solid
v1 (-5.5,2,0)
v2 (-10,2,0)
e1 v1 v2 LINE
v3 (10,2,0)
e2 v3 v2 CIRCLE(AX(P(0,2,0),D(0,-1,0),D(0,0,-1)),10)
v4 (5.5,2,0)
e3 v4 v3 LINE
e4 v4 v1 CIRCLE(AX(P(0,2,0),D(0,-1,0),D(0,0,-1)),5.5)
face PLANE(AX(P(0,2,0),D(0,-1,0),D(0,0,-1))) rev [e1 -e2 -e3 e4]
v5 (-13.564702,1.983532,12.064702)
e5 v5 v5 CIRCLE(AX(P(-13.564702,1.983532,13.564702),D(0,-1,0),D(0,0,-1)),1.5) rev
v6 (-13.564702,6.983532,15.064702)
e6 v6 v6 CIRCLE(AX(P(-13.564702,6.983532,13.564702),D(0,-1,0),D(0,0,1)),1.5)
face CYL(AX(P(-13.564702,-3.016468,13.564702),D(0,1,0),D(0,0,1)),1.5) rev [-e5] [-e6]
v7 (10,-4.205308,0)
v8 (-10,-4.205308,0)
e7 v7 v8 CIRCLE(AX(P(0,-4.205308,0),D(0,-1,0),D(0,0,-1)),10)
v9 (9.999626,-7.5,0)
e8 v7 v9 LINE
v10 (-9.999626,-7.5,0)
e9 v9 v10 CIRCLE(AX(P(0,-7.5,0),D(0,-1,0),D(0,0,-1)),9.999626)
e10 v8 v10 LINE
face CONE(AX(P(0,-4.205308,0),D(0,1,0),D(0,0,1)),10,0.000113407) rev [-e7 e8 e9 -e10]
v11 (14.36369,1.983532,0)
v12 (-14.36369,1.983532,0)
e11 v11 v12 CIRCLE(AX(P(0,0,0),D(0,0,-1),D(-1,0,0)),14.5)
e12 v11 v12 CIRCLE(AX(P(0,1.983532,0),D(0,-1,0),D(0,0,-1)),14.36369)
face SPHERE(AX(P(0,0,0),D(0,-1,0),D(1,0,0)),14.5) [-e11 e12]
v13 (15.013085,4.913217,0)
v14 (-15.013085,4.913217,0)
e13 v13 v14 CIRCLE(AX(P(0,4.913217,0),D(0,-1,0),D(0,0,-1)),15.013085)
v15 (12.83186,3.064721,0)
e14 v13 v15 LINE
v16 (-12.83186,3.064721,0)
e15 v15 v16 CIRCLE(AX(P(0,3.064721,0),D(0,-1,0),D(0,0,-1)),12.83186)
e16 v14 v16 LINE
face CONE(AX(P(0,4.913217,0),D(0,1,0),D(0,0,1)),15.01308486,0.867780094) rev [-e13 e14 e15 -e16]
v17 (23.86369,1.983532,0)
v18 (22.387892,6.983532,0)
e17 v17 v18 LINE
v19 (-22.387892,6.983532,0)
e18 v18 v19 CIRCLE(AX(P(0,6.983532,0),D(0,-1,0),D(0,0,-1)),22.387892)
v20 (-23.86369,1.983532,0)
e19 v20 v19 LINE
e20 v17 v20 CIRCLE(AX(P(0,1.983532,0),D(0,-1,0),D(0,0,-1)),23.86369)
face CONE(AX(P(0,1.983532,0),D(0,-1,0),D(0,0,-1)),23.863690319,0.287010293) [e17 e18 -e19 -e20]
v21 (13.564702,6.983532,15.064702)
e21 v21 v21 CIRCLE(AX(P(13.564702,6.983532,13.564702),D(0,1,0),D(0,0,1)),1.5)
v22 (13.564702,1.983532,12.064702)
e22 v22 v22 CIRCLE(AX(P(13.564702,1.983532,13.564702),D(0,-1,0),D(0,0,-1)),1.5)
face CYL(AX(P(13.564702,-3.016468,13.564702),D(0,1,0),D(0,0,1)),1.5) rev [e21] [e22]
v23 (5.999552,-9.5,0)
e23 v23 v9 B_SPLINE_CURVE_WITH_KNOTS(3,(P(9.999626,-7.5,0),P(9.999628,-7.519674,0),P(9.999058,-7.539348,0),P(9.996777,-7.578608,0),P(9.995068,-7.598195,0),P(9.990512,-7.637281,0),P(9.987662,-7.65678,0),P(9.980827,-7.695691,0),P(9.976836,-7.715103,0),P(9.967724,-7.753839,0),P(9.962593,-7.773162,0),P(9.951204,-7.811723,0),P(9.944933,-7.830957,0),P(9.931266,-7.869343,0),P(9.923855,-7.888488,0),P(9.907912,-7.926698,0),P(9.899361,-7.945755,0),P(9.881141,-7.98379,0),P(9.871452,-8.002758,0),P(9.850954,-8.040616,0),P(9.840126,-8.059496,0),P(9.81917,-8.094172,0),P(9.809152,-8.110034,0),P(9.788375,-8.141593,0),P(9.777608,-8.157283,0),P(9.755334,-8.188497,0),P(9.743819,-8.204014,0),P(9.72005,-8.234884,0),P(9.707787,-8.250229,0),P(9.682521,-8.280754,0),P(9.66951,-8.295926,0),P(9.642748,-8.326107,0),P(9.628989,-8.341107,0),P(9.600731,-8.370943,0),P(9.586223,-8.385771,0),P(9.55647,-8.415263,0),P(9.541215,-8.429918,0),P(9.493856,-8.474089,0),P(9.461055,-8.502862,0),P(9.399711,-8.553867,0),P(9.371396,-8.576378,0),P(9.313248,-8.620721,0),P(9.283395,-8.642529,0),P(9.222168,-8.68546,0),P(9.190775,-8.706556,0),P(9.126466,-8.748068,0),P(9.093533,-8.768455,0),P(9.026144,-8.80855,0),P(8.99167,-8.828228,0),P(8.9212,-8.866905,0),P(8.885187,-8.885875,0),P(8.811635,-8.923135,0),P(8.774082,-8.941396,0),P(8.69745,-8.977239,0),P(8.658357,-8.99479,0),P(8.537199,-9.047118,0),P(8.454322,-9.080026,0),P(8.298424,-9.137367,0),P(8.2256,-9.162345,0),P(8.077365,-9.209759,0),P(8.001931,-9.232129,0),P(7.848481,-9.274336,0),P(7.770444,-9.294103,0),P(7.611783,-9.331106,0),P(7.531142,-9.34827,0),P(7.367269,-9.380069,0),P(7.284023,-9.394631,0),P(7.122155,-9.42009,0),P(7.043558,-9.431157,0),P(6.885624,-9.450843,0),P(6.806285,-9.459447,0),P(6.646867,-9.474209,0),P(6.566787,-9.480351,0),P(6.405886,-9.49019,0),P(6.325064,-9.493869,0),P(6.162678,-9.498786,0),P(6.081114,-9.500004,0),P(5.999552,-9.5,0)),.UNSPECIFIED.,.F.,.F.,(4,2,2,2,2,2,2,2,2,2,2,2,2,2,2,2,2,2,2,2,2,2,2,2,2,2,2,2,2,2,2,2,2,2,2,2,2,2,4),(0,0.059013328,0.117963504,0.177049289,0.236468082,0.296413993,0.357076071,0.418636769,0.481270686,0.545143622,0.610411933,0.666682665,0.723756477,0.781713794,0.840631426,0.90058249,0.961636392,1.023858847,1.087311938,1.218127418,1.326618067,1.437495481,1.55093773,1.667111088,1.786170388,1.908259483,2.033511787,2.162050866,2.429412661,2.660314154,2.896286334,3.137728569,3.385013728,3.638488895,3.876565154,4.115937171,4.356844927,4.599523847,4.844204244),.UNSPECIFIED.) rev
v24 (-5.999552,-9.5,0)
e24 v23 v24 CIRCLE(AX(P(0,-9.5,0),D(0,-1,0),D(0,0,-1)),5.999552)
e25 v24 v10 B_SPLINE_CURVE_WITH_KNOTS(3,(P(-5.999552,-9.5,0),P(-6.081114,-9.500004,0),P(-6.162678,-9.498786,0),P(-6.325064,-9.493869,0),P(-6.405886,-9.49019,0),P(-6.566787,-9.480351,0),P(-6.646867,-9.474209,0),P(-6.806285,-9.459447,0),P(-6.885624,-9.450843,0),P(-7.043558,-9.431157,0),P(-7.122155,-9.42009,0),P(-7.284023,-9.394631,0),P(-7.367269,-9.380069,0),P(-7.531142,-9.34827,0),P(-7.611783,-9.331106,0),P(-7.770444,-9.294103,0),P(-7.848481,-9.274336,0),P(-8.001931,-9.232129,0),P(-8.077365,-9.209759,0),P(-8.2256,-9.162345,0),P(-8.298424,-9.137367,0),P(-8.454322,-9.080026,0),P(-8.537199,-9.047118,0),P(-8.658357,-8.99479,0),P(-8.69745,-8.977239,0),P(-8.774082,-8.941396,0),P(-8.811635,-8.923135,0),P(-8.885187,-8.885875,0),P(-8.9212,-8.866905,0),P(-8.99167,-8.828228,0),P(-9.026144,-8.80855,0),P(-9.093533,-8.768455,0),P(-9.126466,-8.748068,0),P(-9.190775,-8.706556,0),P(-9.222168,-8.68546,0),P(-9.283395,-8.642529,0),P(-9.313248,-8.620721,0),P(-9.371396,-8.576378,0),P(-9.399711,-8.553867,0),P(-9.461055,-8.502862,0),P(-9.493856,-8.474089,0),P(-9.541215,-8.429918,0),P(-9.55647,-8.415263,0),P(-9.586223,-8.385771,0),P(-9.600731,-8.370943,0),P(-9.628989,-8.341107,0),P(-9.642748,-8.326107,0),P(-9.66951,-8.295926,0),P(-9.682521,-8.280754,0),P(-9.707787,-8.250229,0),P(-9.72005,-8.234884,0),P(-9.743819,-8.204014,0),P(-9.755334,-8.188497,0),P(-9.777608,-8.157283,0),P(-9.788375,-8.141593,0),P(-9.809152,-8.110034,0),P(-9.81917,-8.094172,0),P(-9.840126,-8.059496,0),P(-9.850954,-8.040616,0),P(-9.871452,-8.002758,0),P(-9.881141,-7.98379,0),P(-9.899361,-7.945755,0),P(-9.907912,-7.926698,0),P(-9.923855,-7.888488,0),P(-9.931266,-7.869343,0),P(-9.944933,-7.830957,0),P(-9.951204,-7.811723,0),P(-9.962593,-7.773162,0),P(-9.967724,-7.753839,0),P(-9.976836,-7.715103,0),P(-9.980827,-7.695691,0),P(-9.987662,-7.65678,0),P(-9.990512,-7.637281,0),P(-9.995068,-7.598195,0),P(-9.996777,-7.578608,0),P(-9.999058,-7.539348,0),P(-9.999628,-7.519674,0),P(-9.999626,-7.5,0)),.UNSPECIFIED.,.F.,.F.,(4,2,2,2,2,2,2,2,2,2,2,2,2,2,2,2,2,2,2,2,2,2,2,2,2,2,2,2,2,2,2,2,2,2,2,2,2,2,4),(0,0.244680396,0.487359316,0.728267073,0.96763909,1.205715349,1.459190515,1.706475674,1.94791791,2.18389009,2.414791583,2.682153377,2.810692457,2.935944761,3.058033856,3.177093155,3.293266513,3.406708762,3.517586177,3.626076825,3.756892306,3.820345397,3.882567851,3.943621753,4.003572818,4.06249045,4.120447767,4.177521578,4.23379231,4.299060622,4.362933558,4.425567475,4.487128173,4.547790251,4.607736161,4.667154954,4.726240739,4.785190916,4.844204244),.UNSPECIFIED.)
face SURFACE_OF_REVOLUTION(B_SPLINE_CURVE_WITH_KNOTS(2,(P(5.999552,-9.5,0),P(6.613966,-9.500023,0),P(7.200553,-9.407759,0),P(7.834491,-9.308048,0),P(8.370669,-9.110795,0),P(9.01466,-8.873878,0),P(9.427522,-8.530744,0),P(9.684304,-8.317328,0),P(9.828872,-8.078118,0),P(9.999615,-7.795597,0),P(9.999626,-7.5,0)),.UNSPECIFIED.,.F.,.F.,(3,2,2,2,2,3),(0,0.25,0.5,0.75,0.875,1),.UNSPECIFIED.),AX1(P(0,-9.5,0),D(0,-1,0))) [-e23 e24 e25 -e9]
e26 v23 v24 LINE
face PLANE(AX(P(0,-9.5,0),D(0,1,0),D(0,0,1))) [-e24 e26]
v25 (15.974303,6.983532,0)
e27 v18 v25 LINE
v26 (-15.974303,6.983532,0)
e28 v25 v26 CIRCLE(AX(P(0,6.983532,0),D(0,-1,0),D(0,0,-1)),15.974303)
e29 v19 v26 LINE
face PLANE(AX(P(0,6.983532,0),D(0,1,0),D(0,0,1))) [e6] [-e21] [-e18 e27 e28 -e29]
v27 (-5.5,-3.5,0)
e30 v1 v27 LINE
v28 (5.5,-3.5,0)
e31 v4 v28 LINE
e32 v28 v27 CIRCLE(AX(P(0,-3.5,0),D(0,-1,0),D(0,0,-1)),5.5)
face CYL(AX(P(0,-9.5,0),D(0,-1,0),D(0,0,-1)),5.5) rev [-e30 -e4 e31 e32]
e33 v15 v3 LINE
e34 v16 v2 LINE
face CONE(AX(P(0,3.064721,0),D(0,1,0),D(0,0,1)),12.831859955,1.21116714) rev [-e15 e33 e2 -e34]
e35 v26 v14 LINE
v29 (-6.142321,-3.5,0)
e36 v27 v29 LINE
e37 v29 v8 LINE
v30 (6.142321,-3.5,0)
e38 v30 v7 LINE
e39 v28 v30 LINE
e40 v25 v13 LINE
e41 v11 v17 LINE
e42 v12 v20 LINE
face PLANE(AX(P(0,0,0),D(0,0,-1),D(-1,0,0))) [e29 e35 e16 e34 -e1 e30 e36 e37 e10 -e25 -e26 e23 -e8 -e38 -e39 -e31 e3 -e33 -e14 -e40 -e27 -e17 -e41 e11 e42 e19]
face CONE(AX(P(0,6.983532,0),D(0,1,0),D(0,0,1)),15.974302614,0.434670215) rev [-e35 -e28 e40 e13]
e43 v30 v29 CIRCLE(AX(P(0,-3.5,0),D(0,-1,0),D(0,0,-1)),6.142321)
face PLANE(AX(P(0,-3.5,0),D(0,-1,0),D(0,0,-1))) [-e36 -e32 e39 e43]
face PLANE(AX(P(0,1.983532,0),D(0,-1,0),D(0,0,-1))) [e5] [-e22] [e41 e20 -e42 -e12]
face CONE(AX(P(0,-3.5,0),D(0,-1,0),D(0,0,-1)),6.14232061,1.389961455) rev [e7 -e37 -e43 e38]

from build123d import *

# Parameters (mm, degrees)
REVOLVE1_ANGLE     = 180
FILLET1_SIZE       = 4
FILLET1_SIZE_2     = 2
CHAMFER1_SIZE      = 4
CHAMFER1_SIZE2     = 0.705307923
REVOLVE2_ANGLE     = 180
SKETCH3_R          = 1.5
CUT_EXTRUDE1_DEPTH = 10


with BuildPart() as part:
    # Sketch1 → Revolve1 (revolve)
    with BuildSketch(Plane.XY):
        Polygon((0, -9.5), (0, 2), (-5.5, 2), (-5.5, -3.5), (-10, -3.5), (-10, -9.5), align=None)
    revolve(axis=Axis((0, -14.5, 0), (0, 1, 0)), revolution_arc=REVOLVE1_ANGLE)

    # Fillet1
    # an asymmetric fillet: 4, 2 mm, written as the material it takes off along each edge
    with BuildSketch(Plane(origin=(0, -9.5, 0), x_dir=(-0.5389483633149525, 0, -0.8423388045674578), z_dir=(0.8423388045674578, 0, -0.5389483633149525))) as fillet1_piece_1:
        with BuildLine():
            Bezier((10 - FILLET1_SIZE, 0), (10, 0), (10, FILLET1_SIZE_2), weights=[1, 0.707106781, 1])
            Line((10, FILLET1_SIZE_2), (10, 0))
            Line((10, 0), (10 - FILLET1_SIZE, 0))
        make_face()
    revolve(axis=Axis((0, -9.5, 0), (0, 1, 0)), revolution_arc=294.775843921, mode=Mode.SUBTRACT)

    # Chamfer1
    chamfer1_edges = [part.edges().sort_by_distance(p)[0] for p in [
        (0, -3.5, 10),
    ]]
    chamfer1_side = [part.faces().sort_by_distance(p)[0] for p in [
        (0, -3.5, 5.723606798),
    ]]
    chamfer(chamfer1_edges, length=CHAMFER1_SIZE, length2=CHAMFER1_SIZE2, reference=chamfer1_side[0])


with BuildPart() as body_2:
    # Sketch2 → Revolve2 (revolve)
    with BuildSketch(Plane.XY):
        with BuildLine():
            Line((-5.5, 2), (-10, 2))
            Line((-10, 2), (-12.831859955, 3.064721462))
            Line((-12.831859955, 3.064721462), (-15.01308486, 4.913217144))
            Line((-15.01308486, 4.913217144), (-15.974302614, 6.983532307))
            Line((-15.974302614, 6.983532307), (-19.387891627, 6.983532307))
            Line((-19.387891627, 6.983532307), (-22.387891627, 6.983532307))
            Line((-22.387891627, 6.983532307), (-23.863690319, 1.983532307))
            Line((-23.863690319, 1.983532307), (-14.363690319, 1.983532307))
            ThreePointArc((-14.363690319, 1.983532307), (-10.931862112, -9.525985029), (0, -14.5))
            Line((0, -14.5), (0, -9.5))
            Line((0, -9.5), (-5.99955163, -9.5))
            add(Edge.make_bspline(
                [(-5.99955163, -9.5), (-6.613966051, -9.500022958), (-7.200553434, -9.407759327), (-7.834490948, -9.308048049), (-8.370669156, -9.110794638), (-9.014660015, -8.873878269), (-9.427521538, -8.530743599), (-9.68430445, -8.317327925), (-9.82887241, -8.078117533), (-9.999615313, -7.795596589), (-9.999626359, -7.5)],
                knots=[0, 0, 0, 0.25, 0.25, 0.5, 0.5, 0.75, 0.75, 0.875, 0.875, 1, 1, 1], degree=2))
            Line((-9.999626359, -7.5), (-10, -4.205307923))
            Line((-10, -4.205307923), (-6.14232061, -3.5))
            Line((-6.14232061, -3.5), (-5.5, -3.5))
            Line((-5.5, -3.5), (-5.5, 2))
        make_face()
    revolve(axis=Axis((0, -9.5, 0), (0, 1, 0)), revolution_arc=REVOLVE2_ANGLE)

    # Sketch3 → Cut-Extrude1 (cut)
    with BuildSketch(Plane(origin=(0, 6.983532307, 0), x_dir=(1, 0, 0), z_dir=(0, 1, 0))):
        with Locations(Location((13.564701596, -13.564701596, 0), (0, 0, 270))):
            Circle(SKETCH3_R)
    cut_extrude1 = extrude(amount=-CUT_EXTRUDE1_DEPTH, mode=Mode.SUBTRACT)

    # Mirror1: Cut-Extrude1 across plane
    add(cut_extrude1.mirror(Plane(origin=(0, 0, 0), x_dir=(0, 0, 1), z_dir=(1, 0, 0))), mode=Mode.SUBTRACT)


solid = body_2.part
